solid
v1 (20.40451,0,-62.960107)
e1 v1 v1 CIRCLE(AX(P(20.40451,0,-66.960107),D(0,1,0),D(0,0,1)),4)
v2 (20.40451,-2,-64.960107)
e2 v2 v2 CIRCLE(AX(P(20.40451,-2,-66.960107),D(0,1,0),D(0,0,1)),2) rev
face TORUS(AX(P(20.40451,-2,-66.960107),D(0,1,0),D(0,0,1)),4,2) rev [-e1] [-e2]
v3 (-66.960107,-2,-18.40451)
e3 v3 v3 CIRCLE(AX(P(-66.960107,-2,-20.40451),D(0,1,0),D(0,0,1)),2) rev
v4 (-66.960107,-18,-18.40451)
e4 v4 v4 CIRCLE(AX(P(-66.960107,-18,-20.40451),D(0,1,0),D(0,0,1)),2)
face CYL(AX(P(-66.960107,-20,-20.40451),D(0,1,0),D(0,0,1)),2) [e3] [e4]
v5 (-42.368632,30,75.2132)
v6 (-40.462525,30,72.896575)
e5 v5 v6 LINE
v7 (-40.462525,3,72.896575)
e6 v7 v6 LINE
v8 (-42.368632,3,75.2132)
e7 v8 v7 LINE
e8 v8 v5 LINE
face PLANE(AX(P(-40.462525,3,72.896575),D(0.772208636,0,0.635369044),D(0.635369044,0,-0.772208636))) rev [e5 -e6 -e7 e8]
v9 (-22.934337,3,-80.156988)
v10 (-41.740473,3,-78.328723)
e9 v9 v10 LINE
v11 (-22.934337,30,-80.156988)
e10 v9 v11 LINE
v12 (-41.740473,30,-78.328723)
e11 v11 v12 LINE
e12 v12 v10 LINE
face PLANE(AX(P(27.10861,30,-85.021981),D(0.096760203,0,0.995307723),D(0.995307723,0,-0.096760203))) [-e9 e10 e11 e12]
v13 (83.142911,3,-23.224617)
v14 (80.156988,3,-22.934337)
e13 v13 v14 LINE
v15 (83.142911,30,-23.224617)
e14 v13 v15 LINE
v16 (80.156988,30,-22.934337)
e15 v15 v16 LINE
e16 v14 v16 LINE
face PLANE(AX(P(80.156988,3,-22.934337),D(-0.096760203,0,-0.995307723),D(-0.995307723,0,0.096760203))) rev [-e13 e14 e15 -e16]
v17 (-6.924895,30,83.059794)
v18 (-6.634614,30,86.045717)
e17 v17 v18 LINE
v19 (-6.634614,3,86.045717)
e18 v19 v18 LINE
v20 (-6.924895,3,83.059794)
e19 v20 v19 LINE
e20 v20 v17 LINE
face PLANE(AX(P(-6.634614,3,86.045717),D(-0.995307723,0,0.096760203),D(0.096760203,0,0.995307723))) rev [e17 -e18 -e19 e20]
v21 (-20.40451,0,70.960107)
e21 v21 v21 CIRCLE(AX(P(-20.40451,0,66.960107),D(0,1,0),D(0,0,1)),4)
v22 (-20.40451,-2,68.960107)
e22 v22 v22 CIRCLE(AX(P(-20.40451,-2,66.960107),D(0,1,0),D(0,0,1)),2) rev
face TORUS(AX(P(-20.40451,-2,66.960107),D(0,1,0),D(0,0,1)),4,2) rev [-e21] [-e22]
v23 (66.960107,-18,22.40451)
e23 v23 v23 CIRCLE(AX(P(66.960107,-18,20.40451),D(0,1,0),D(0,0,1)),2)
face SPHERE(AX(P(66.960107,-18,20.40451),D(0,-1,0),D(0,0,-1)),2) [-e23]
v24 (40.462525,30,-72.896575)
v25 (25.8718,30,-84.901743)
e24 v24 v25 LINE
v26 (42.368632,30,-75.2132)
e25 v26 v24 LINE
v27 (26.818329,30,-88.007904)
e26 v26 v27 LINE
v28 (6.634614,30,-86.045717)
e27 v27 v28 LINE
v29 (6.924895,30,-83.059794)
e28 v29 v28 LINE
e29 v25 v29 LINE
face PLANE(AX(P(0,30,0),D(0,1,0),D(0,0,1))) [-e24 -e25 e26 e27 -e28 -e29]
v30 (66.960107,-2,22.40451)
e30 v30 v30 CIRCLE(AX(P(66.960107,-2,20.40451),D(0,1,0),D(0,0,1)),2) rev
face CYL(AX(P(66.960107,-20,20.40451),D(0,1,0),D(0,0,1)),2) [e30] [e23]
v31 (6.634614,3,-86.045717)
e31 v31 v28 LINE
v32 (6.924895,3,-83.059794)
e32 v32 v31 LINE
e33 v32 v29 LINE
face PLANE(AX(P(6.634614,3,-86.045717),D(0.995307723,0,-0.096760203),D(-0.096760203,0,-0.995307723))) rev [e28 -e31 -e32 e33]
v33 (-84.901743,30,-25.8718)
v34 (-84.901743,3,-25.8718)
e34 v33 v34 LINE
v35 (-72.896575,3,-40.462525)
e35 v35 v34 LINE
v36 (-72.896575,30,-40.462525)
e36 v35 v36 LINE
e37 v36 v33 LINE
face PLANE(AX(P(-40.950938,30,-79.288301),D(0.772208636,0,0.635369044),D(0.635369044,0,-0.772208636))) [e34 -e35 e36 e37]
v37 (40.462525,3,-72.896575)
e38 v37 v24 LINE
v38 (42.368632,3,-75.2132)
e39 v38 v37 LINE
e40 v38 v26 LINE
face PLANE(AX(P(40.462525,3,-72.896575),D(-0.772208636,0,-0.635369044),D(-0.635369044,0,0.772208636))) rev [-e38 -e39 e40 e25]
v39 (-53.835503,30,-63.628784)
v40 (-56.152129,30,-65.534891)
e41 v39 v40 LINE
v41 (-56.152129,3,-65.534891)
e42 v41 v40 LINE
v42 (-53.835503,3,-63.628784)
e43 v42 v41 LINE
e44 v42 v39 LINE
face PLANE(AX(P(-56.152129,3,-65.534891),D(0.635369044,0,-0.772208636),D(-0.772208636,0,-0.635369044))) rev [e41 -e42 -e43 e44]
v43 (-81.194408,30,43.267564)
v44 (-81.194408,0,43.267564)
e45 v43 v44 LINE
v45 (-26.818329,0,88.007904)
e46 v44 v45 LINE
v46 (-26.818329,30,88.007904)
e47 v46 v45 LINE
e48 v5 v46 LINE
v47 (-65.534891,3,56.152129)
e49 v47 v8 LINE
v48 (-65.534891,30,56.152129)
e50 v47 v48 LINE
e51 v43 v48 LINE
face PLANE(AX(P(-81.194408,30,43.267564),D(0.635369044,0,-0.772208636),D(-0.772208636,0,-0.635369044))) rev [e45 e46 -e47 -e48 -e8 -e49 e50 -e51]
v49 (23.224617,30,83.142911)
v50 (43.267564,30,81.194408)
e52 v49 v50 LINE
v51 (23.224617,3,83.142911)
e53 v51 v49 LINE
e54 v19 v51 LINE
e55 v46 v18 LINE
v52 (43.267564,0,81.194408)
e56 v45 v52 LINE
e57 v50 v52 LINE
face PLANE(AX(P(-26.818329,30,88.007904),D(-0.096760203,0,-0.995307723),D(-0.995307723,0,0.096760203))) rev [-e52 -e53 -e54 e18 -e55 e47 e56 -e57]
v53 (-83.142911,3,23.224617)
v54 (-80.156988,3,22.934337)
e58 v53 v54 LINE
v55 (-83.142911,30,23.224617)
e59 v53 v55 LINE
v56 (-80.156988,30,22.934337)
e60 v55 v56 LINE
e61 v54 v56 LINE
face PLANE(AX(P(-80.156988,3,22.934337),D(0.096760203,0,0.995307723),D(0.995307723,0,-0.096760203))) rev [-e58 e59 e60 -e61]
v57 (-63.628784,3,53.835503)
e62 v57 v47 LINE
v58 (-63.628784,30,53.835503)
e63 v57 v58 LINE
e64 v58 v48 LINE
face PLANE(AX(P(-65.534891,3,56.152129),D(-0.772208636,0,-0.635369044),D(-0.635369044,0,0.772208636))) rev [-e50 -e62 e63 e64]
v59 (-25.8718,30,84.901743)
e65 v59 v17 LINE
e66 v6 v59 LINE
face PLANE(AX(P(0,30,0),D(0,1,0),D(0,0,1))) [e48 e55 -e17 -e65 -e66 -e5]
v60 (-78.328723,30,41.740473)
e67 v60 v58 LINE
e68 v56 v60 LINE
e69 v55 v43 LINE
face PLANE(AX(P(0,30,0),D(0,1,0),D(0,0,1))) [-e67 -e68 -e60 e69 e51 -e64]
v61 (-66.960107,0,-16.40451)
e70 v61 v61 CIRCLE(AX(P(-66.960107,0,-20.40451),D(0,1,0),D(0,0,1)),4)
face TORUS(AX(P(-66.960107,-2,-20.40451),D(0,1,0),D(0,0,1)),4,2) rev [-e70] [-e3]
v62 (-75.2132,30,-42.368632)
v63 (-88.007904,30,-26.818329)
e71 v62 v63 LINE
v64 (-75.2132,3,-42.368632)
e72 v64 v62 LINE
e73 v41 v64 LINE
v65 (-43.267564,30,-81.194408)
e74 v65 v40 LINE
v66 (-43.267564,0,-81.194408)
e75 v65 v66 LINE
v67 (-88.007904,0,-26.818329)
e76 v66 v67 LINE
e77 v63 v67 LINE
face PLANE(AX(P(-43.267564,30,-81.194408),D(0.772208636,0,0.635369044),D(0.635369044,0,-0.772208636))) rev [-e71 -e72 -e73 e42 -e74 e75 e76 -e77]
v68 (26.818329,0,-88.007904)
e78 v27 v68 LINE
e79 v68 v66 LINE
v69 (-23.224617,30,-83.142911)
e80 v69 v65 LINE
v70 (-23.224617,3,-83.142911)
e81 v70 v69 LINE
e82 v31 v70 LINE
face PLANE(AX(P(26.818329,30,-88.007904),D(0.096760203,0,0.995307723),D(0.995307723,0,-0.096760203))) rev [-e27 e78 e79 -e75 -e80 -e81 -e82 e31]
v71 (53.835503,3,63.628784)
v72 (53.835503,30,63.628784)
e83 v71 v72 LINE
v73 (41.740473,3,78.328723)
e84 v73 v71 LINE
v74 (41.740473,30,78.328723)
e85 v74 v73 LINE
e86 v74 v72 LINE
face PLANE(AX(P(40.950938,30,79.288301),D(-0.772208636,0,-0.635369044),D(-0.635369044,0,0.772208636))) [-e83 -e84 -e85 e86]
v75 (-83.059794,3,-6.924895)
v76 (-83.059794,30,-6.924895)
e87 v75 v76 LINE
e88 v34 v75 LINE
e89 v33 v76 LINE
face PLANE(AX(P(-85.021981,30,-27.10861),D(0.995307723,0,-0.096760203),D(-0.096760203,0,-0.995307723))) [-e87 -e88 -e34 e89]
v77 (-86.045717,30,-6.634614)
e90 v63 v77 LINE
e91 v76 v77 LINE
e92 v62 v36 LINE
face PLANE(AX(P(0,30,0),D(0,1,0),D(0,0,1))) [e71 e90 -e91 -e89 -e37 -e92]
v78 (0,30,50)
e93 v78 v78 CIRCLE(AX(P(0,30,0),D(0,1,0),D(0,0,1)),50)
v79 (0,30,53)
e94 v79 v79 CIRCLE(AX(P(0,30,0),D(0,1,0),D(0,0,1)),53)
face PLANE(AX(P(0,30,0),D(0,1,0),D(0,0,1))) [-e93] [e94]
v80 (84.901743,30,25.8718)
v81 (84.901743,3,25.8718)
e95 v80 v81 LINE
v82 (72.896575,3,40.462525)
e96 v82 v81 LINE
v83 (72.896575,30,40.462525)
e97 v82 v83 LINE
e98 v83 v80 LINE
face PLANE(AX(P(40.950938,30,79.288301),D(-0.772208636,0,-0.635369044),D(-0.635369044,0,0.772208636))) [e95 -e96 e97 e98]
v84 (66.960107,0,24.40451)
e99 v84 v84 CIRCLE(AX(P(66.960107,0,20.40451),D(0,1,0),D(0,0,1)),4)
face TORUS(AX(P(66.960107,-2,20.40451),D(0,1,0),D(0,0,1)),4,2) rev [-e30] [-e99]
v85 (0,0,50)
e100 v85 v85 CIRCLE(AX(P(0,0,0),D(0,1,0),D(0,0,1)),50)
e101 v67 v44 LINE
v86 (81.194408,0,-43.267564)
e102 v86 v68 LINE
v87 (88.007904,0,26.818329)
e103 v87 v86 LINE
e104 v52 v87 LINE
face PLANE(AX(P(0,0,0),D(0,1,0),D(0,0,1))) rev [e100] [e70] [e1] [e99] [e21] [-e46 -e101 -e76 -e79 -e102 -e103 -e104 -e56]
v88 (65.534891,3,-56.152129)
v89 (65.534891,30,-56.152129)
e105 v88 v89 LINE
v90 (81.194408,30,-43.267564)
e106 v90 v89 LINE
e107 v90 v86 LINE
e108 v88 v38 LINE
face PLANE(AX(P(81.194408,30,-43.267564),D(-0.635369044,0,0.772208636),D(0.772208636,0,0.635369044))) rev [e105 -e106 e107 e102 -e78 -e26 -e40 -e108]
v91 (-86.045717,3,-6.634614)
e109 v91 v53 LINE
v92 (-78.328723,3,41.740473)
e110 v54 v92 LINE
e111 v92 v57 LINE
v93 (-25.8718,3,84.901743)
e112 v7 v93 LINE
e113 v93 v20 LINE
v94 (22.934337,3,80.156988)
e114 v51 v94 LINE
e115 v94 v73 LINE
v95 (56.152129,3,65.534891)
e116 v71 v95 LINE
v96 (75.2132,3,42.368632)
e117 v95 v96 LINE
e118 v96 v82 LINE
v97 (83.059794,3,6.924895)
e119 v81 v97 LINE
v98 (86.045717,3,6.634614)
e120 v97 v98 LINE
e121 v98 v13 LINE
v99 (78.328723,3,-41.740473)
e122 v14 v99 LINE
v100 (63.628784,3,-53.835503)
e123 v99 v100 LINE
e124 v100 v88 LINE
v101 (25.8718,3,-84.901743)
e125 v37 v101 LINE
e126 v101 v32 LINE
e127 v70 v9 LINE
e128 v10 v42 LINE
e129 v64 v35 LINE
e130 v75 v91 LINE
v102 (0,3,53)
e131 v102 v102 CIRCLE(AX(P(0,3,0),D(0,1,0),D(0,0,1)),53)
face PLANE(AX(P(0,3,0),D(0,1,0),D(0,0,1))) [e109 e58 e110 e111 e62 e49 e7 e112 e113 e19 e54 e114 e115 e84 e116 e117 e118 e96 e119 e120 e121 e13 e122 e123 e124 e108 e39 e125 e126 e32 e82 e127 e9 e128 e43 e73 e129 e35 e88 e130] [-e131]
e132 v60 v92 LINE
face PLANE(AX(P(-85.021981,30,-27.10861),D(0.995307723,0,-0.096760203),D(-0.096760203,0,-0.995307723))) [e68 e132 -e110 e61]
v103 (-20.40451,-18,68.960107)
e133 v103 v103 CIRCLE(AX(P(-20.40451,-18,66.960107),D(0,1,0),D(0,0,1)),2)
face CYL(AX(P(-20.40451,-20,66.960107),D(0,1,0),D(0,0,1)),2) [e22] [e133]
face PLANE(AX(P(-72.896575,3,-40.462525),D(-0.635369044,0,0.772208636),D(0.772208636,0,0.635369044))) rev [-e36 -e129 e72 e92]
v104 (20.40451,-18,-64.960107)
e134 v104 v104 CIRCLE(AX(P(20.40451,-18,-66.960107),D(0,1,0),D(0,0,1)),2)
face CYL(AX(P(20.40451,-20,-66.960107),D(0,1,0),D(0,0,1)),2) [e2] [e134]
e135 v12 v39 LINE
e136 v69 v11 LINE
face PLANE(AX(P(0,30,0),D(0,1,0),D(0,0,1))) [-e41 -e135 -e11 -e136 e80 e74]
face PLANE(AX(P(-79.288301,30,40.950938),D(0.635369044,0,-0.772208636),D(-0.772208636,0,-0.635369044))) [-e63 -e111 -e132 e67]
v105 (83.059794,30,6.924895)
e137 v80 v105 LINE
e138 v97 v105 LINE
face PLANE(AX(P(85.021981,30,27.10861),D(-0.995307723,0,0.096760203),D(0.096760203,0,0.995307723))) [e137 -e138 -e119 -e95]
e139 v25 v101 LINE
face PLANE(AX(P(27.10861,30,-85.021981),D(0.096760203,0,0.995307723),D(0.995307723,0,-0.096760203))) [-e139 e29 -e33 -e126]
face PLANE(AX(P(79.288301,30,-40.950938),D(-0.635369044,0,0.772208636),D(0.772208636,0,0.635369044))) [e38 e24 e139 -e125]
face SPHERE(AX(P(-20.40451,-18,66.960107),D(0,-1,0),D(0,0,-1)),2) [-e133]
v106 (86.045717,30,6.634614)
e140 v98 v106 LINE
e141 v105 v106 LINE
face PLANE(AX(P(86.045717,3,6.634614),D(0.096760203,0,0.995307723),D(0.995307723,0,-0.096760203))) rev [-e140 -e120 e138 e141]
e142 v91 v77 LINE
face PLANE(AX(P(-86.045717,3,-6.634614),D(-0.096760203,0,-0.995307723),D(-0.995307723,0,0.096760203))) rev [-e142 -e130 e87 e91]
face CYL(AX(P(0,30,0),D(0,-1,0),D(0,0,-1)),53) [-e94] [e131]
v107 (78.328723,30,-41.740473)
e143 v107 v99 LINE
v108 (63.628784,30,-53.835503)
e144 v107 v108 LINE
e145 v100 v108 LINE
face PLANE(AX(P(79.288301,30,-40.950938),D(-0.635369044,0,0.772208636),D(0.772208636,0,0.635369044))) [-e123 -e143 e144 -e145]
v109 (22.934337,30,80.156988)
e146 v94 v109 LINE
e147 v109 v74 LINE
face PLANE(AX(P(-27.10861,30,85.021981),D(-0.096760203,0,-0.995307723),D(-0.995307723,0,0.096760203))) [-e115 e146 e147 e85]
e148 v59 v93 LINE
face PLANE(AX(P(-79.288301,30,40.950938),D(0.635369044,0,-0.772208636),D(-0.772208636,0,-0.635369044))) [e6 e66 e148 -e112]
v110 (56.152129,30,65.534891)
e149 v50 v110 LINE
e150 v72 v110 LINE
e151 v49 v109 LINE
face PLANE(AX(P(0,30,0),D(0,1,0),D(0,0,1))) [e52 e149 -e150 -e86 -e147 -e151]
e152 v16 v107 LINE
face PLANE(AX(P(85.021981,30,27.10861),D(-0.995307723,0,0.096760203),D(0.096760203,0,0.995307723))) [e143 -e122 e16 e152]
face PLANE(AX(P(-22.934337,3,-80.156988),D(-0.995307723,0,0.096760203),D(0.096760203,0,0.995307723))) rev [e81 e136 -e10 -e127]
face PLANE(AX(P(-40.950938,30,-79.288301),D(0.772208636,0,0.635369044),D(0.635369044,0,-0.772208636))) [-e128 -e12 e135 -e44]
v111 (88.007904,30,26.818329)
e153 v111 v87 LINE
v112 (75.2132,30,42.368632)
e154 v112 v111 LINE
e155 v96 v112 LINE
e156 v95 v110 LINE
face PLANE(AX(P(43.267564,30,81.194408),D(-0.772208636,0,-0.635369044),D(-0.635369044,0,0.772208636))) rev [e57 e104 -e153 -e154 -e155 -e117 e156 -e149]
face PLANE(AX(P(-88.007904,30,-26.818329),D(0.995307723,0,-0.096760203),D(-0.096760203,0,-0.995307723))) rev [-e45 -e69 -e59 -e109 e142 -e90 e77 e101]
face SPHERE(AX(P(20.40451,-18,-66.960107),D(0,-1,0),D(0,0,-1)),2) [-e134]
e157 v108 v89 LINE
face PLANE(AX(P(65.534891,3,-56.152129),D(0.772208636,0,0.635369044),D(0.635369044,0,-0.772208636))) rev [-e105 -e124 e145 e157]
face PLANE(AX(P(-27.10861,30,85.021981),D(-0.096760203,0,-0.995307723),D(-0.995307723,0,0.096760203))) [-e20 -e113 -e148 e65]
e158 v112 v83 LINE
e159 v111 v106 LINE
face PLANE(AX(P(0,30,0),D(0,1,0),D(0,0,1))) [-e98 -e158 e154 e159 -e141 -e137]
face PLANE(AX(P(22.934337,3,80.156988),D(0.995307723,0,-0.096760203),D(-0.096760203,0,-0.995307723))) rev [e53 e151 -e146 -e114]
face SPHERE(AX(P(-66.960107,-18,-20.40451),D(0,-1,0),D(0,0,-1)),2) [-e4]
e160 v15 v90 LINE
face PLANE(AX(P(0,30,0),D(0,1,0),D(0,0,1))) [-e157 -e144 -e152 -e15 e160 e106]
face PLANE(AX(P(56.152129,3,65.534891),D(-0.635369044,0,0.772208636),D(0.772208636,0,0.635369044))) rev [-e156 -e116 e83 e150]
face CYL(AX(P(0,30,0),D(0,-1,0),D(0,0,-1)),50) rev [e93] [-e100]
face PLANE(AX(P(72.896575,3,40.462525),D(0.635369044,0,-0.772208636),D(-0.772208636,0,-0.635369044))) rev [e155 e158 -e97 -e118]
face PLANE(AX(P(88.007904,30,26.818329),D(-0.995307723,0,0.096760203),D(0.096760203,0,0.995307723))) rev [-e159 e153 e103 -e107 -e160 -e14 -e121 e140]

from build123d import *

# Parameters (mm, degrees)
SKETCH1_R           = 50
BOSS_EXTRUDE1_DEPTH = 30
SKETCH2_R           = 2
BOSS_EXTRUDE2_DEPTH = 20
FILLET1_R           = 2
SHELL1_START        = 3
SHELL1_OUTLINE_R    = 53
SHELL1_DEPTH        = 27
CUT_EXTRUDE1_DEPTH  = 27


# Read off the part's stored shape, not the designer's step: Shell1
with BuildPart() as part:
    # Sketch1 → Boss-Extrude1 (new body)
    with BuildSketch(Plane(origin=(0, 0, 0), x_dir=(1, 0, 0), z_dir=(0, 1, 0))):
        Polygon((-43.26756368, 81.194408409), (-88.007904464, 26.818329097), (-81.194408409, -43.26756368), (-26.818329097, -88.007904464), (43.26756368, -81.194408409), (88.007904464, -26.818329097), (81.194408409, 43.26756368), (26.818329097, 88.007904464), align=None)
        with Locations(Location((0, 0, 0), (0, 0, 270))):
            Circle(SKETCH1_R, mode=Mode.SUBTRACT)
    extrude(amount=BOSS_EXTRUDE1_DEPTH)

    # Sketch2 → Boss-Extrude2 (add)
    with BuildSketch(Plane(origin=(0, 0, 0), x_dir=(-1, 0, 0), z_dir=(0, -1, 0))):
        with Locations(Location((66.960107228, 20.404510287, 0), (0, 0, 270))):
            Circle(SKETCH2_R)
        with Locations(Location((20.404510287, -66.960107228, 0), (0, 0, 270))):
            Circle(SKETCH2_R)
        with Locations(Location((-66.960107228, -20.404510287, 0), (0, 0, 270))):
            Circle(SKETCH2_R)
        with Locations(Location((-20.404510287, 66.960107228, 0), (0, 0, 270))):
            Circle(SKETCH2_R)
    extrude(amount=BOSS_EXTRUDE2_DEPTH)

    # Fillet1
    fillet1_edges = [part.edges().sort_by_distance(p)[0] for p in [
        (-66.960107228, 0, -22.404510287),
        (-66.960107228, -20, -22.404510287),
        (-20.404510287, 0, 64.960107228),
        (-20.404510287, -20, 64.960107228),
        (66.960107228, 0, 18.404510287),
        (66.960107228, -20, 18.404510287),
        (20.404510287, 0, -68.960107228),
        (20.404510287, -20, -68.960107228),
    ]]
    fillet(fillet1_edges, radius=FILLET1_R)

    # Shell1 outline → Shell1 (cut)
    with BuildSketch(Plane(origin=(0, 0, 0), x_dir=(1, 0, 0), z_dir=(0, 1, 0)).offset(SHELL1_START)):
        Polygon((25.871799834, 84.90174313), (-41.740473197, 78.328723406), (-84.90174313, 25.871799834), (-78.328723406, -41.740473197), (-25.871799834, -84.90174313), (41.740473197, -78.328723406), (84.90174313, -25.871799834), (78.328723406, 41.740473197), align=None)
        Circle(SHELL1_OUTLINE_R, mode=Mode.SUBTRACT)
    extrude(amount=SHELL1_DEPTH, mode=Mode.SUBTRACT)

    # Sketch3 → Cut-Extrude1 (cut)
    with BuildSketch(Plane(origin=(0, 30, 0), x_dir=(1, 0, 0), z_dir=(0, 1, 0))):
        Polygon((6.634614392, 86.045716996), (6.924895002, 83.059793827), (-22.934336682, 80.156987724), (-23.224617292, 83.142910893), align=None)
        Polygon((63.628783674, 53.835503244), (40.46252459, 72.896574569), (42.368631722, 75.213200477), (65.534890807, 56.152129153), align=None)
        Polygon((83.059793827, -6.924895002), (80.156987724, 22.934336682), (83.142910893, 23.224617292), (86.045716996, -6.634614392), align=None)
        Polygon((53.835503244, -63.628783674), (72.896574569, -40.46252459), (75.213200477, -42.368631722), (56.152129153, -65.534890807), align=None)
        Polygon((-6.924895002, -83.059793827), (22.934336682, -80.156987724), (23.224617292, -83.142910893), (-6.634614392, -86.045716996), align=None)
        Polygon((-63.628783674, -53.835503244), (-40.46252459, -72.896574569), (-42.368631722, -75.213200477), (-65.534890807, -56.152129153), align=None)
        Polygon((-83.059793827, 6.924895002), (-80.156987724, -22.934336682), (-83.142910893, -23.224617292), (-86.045716996, 6.634614392), align=None)
        Polygon((-53.835503244, 63.628783674), (-72.896574569, 40.46252459), (-75.213200477, 42.368631722), (-56.152129153, 65.534890807), align=None)
    extrude(amount=-CUT_EXTRUDE1_DEPTH, mode=Mode.SUBTRACT)


solid = part.part
